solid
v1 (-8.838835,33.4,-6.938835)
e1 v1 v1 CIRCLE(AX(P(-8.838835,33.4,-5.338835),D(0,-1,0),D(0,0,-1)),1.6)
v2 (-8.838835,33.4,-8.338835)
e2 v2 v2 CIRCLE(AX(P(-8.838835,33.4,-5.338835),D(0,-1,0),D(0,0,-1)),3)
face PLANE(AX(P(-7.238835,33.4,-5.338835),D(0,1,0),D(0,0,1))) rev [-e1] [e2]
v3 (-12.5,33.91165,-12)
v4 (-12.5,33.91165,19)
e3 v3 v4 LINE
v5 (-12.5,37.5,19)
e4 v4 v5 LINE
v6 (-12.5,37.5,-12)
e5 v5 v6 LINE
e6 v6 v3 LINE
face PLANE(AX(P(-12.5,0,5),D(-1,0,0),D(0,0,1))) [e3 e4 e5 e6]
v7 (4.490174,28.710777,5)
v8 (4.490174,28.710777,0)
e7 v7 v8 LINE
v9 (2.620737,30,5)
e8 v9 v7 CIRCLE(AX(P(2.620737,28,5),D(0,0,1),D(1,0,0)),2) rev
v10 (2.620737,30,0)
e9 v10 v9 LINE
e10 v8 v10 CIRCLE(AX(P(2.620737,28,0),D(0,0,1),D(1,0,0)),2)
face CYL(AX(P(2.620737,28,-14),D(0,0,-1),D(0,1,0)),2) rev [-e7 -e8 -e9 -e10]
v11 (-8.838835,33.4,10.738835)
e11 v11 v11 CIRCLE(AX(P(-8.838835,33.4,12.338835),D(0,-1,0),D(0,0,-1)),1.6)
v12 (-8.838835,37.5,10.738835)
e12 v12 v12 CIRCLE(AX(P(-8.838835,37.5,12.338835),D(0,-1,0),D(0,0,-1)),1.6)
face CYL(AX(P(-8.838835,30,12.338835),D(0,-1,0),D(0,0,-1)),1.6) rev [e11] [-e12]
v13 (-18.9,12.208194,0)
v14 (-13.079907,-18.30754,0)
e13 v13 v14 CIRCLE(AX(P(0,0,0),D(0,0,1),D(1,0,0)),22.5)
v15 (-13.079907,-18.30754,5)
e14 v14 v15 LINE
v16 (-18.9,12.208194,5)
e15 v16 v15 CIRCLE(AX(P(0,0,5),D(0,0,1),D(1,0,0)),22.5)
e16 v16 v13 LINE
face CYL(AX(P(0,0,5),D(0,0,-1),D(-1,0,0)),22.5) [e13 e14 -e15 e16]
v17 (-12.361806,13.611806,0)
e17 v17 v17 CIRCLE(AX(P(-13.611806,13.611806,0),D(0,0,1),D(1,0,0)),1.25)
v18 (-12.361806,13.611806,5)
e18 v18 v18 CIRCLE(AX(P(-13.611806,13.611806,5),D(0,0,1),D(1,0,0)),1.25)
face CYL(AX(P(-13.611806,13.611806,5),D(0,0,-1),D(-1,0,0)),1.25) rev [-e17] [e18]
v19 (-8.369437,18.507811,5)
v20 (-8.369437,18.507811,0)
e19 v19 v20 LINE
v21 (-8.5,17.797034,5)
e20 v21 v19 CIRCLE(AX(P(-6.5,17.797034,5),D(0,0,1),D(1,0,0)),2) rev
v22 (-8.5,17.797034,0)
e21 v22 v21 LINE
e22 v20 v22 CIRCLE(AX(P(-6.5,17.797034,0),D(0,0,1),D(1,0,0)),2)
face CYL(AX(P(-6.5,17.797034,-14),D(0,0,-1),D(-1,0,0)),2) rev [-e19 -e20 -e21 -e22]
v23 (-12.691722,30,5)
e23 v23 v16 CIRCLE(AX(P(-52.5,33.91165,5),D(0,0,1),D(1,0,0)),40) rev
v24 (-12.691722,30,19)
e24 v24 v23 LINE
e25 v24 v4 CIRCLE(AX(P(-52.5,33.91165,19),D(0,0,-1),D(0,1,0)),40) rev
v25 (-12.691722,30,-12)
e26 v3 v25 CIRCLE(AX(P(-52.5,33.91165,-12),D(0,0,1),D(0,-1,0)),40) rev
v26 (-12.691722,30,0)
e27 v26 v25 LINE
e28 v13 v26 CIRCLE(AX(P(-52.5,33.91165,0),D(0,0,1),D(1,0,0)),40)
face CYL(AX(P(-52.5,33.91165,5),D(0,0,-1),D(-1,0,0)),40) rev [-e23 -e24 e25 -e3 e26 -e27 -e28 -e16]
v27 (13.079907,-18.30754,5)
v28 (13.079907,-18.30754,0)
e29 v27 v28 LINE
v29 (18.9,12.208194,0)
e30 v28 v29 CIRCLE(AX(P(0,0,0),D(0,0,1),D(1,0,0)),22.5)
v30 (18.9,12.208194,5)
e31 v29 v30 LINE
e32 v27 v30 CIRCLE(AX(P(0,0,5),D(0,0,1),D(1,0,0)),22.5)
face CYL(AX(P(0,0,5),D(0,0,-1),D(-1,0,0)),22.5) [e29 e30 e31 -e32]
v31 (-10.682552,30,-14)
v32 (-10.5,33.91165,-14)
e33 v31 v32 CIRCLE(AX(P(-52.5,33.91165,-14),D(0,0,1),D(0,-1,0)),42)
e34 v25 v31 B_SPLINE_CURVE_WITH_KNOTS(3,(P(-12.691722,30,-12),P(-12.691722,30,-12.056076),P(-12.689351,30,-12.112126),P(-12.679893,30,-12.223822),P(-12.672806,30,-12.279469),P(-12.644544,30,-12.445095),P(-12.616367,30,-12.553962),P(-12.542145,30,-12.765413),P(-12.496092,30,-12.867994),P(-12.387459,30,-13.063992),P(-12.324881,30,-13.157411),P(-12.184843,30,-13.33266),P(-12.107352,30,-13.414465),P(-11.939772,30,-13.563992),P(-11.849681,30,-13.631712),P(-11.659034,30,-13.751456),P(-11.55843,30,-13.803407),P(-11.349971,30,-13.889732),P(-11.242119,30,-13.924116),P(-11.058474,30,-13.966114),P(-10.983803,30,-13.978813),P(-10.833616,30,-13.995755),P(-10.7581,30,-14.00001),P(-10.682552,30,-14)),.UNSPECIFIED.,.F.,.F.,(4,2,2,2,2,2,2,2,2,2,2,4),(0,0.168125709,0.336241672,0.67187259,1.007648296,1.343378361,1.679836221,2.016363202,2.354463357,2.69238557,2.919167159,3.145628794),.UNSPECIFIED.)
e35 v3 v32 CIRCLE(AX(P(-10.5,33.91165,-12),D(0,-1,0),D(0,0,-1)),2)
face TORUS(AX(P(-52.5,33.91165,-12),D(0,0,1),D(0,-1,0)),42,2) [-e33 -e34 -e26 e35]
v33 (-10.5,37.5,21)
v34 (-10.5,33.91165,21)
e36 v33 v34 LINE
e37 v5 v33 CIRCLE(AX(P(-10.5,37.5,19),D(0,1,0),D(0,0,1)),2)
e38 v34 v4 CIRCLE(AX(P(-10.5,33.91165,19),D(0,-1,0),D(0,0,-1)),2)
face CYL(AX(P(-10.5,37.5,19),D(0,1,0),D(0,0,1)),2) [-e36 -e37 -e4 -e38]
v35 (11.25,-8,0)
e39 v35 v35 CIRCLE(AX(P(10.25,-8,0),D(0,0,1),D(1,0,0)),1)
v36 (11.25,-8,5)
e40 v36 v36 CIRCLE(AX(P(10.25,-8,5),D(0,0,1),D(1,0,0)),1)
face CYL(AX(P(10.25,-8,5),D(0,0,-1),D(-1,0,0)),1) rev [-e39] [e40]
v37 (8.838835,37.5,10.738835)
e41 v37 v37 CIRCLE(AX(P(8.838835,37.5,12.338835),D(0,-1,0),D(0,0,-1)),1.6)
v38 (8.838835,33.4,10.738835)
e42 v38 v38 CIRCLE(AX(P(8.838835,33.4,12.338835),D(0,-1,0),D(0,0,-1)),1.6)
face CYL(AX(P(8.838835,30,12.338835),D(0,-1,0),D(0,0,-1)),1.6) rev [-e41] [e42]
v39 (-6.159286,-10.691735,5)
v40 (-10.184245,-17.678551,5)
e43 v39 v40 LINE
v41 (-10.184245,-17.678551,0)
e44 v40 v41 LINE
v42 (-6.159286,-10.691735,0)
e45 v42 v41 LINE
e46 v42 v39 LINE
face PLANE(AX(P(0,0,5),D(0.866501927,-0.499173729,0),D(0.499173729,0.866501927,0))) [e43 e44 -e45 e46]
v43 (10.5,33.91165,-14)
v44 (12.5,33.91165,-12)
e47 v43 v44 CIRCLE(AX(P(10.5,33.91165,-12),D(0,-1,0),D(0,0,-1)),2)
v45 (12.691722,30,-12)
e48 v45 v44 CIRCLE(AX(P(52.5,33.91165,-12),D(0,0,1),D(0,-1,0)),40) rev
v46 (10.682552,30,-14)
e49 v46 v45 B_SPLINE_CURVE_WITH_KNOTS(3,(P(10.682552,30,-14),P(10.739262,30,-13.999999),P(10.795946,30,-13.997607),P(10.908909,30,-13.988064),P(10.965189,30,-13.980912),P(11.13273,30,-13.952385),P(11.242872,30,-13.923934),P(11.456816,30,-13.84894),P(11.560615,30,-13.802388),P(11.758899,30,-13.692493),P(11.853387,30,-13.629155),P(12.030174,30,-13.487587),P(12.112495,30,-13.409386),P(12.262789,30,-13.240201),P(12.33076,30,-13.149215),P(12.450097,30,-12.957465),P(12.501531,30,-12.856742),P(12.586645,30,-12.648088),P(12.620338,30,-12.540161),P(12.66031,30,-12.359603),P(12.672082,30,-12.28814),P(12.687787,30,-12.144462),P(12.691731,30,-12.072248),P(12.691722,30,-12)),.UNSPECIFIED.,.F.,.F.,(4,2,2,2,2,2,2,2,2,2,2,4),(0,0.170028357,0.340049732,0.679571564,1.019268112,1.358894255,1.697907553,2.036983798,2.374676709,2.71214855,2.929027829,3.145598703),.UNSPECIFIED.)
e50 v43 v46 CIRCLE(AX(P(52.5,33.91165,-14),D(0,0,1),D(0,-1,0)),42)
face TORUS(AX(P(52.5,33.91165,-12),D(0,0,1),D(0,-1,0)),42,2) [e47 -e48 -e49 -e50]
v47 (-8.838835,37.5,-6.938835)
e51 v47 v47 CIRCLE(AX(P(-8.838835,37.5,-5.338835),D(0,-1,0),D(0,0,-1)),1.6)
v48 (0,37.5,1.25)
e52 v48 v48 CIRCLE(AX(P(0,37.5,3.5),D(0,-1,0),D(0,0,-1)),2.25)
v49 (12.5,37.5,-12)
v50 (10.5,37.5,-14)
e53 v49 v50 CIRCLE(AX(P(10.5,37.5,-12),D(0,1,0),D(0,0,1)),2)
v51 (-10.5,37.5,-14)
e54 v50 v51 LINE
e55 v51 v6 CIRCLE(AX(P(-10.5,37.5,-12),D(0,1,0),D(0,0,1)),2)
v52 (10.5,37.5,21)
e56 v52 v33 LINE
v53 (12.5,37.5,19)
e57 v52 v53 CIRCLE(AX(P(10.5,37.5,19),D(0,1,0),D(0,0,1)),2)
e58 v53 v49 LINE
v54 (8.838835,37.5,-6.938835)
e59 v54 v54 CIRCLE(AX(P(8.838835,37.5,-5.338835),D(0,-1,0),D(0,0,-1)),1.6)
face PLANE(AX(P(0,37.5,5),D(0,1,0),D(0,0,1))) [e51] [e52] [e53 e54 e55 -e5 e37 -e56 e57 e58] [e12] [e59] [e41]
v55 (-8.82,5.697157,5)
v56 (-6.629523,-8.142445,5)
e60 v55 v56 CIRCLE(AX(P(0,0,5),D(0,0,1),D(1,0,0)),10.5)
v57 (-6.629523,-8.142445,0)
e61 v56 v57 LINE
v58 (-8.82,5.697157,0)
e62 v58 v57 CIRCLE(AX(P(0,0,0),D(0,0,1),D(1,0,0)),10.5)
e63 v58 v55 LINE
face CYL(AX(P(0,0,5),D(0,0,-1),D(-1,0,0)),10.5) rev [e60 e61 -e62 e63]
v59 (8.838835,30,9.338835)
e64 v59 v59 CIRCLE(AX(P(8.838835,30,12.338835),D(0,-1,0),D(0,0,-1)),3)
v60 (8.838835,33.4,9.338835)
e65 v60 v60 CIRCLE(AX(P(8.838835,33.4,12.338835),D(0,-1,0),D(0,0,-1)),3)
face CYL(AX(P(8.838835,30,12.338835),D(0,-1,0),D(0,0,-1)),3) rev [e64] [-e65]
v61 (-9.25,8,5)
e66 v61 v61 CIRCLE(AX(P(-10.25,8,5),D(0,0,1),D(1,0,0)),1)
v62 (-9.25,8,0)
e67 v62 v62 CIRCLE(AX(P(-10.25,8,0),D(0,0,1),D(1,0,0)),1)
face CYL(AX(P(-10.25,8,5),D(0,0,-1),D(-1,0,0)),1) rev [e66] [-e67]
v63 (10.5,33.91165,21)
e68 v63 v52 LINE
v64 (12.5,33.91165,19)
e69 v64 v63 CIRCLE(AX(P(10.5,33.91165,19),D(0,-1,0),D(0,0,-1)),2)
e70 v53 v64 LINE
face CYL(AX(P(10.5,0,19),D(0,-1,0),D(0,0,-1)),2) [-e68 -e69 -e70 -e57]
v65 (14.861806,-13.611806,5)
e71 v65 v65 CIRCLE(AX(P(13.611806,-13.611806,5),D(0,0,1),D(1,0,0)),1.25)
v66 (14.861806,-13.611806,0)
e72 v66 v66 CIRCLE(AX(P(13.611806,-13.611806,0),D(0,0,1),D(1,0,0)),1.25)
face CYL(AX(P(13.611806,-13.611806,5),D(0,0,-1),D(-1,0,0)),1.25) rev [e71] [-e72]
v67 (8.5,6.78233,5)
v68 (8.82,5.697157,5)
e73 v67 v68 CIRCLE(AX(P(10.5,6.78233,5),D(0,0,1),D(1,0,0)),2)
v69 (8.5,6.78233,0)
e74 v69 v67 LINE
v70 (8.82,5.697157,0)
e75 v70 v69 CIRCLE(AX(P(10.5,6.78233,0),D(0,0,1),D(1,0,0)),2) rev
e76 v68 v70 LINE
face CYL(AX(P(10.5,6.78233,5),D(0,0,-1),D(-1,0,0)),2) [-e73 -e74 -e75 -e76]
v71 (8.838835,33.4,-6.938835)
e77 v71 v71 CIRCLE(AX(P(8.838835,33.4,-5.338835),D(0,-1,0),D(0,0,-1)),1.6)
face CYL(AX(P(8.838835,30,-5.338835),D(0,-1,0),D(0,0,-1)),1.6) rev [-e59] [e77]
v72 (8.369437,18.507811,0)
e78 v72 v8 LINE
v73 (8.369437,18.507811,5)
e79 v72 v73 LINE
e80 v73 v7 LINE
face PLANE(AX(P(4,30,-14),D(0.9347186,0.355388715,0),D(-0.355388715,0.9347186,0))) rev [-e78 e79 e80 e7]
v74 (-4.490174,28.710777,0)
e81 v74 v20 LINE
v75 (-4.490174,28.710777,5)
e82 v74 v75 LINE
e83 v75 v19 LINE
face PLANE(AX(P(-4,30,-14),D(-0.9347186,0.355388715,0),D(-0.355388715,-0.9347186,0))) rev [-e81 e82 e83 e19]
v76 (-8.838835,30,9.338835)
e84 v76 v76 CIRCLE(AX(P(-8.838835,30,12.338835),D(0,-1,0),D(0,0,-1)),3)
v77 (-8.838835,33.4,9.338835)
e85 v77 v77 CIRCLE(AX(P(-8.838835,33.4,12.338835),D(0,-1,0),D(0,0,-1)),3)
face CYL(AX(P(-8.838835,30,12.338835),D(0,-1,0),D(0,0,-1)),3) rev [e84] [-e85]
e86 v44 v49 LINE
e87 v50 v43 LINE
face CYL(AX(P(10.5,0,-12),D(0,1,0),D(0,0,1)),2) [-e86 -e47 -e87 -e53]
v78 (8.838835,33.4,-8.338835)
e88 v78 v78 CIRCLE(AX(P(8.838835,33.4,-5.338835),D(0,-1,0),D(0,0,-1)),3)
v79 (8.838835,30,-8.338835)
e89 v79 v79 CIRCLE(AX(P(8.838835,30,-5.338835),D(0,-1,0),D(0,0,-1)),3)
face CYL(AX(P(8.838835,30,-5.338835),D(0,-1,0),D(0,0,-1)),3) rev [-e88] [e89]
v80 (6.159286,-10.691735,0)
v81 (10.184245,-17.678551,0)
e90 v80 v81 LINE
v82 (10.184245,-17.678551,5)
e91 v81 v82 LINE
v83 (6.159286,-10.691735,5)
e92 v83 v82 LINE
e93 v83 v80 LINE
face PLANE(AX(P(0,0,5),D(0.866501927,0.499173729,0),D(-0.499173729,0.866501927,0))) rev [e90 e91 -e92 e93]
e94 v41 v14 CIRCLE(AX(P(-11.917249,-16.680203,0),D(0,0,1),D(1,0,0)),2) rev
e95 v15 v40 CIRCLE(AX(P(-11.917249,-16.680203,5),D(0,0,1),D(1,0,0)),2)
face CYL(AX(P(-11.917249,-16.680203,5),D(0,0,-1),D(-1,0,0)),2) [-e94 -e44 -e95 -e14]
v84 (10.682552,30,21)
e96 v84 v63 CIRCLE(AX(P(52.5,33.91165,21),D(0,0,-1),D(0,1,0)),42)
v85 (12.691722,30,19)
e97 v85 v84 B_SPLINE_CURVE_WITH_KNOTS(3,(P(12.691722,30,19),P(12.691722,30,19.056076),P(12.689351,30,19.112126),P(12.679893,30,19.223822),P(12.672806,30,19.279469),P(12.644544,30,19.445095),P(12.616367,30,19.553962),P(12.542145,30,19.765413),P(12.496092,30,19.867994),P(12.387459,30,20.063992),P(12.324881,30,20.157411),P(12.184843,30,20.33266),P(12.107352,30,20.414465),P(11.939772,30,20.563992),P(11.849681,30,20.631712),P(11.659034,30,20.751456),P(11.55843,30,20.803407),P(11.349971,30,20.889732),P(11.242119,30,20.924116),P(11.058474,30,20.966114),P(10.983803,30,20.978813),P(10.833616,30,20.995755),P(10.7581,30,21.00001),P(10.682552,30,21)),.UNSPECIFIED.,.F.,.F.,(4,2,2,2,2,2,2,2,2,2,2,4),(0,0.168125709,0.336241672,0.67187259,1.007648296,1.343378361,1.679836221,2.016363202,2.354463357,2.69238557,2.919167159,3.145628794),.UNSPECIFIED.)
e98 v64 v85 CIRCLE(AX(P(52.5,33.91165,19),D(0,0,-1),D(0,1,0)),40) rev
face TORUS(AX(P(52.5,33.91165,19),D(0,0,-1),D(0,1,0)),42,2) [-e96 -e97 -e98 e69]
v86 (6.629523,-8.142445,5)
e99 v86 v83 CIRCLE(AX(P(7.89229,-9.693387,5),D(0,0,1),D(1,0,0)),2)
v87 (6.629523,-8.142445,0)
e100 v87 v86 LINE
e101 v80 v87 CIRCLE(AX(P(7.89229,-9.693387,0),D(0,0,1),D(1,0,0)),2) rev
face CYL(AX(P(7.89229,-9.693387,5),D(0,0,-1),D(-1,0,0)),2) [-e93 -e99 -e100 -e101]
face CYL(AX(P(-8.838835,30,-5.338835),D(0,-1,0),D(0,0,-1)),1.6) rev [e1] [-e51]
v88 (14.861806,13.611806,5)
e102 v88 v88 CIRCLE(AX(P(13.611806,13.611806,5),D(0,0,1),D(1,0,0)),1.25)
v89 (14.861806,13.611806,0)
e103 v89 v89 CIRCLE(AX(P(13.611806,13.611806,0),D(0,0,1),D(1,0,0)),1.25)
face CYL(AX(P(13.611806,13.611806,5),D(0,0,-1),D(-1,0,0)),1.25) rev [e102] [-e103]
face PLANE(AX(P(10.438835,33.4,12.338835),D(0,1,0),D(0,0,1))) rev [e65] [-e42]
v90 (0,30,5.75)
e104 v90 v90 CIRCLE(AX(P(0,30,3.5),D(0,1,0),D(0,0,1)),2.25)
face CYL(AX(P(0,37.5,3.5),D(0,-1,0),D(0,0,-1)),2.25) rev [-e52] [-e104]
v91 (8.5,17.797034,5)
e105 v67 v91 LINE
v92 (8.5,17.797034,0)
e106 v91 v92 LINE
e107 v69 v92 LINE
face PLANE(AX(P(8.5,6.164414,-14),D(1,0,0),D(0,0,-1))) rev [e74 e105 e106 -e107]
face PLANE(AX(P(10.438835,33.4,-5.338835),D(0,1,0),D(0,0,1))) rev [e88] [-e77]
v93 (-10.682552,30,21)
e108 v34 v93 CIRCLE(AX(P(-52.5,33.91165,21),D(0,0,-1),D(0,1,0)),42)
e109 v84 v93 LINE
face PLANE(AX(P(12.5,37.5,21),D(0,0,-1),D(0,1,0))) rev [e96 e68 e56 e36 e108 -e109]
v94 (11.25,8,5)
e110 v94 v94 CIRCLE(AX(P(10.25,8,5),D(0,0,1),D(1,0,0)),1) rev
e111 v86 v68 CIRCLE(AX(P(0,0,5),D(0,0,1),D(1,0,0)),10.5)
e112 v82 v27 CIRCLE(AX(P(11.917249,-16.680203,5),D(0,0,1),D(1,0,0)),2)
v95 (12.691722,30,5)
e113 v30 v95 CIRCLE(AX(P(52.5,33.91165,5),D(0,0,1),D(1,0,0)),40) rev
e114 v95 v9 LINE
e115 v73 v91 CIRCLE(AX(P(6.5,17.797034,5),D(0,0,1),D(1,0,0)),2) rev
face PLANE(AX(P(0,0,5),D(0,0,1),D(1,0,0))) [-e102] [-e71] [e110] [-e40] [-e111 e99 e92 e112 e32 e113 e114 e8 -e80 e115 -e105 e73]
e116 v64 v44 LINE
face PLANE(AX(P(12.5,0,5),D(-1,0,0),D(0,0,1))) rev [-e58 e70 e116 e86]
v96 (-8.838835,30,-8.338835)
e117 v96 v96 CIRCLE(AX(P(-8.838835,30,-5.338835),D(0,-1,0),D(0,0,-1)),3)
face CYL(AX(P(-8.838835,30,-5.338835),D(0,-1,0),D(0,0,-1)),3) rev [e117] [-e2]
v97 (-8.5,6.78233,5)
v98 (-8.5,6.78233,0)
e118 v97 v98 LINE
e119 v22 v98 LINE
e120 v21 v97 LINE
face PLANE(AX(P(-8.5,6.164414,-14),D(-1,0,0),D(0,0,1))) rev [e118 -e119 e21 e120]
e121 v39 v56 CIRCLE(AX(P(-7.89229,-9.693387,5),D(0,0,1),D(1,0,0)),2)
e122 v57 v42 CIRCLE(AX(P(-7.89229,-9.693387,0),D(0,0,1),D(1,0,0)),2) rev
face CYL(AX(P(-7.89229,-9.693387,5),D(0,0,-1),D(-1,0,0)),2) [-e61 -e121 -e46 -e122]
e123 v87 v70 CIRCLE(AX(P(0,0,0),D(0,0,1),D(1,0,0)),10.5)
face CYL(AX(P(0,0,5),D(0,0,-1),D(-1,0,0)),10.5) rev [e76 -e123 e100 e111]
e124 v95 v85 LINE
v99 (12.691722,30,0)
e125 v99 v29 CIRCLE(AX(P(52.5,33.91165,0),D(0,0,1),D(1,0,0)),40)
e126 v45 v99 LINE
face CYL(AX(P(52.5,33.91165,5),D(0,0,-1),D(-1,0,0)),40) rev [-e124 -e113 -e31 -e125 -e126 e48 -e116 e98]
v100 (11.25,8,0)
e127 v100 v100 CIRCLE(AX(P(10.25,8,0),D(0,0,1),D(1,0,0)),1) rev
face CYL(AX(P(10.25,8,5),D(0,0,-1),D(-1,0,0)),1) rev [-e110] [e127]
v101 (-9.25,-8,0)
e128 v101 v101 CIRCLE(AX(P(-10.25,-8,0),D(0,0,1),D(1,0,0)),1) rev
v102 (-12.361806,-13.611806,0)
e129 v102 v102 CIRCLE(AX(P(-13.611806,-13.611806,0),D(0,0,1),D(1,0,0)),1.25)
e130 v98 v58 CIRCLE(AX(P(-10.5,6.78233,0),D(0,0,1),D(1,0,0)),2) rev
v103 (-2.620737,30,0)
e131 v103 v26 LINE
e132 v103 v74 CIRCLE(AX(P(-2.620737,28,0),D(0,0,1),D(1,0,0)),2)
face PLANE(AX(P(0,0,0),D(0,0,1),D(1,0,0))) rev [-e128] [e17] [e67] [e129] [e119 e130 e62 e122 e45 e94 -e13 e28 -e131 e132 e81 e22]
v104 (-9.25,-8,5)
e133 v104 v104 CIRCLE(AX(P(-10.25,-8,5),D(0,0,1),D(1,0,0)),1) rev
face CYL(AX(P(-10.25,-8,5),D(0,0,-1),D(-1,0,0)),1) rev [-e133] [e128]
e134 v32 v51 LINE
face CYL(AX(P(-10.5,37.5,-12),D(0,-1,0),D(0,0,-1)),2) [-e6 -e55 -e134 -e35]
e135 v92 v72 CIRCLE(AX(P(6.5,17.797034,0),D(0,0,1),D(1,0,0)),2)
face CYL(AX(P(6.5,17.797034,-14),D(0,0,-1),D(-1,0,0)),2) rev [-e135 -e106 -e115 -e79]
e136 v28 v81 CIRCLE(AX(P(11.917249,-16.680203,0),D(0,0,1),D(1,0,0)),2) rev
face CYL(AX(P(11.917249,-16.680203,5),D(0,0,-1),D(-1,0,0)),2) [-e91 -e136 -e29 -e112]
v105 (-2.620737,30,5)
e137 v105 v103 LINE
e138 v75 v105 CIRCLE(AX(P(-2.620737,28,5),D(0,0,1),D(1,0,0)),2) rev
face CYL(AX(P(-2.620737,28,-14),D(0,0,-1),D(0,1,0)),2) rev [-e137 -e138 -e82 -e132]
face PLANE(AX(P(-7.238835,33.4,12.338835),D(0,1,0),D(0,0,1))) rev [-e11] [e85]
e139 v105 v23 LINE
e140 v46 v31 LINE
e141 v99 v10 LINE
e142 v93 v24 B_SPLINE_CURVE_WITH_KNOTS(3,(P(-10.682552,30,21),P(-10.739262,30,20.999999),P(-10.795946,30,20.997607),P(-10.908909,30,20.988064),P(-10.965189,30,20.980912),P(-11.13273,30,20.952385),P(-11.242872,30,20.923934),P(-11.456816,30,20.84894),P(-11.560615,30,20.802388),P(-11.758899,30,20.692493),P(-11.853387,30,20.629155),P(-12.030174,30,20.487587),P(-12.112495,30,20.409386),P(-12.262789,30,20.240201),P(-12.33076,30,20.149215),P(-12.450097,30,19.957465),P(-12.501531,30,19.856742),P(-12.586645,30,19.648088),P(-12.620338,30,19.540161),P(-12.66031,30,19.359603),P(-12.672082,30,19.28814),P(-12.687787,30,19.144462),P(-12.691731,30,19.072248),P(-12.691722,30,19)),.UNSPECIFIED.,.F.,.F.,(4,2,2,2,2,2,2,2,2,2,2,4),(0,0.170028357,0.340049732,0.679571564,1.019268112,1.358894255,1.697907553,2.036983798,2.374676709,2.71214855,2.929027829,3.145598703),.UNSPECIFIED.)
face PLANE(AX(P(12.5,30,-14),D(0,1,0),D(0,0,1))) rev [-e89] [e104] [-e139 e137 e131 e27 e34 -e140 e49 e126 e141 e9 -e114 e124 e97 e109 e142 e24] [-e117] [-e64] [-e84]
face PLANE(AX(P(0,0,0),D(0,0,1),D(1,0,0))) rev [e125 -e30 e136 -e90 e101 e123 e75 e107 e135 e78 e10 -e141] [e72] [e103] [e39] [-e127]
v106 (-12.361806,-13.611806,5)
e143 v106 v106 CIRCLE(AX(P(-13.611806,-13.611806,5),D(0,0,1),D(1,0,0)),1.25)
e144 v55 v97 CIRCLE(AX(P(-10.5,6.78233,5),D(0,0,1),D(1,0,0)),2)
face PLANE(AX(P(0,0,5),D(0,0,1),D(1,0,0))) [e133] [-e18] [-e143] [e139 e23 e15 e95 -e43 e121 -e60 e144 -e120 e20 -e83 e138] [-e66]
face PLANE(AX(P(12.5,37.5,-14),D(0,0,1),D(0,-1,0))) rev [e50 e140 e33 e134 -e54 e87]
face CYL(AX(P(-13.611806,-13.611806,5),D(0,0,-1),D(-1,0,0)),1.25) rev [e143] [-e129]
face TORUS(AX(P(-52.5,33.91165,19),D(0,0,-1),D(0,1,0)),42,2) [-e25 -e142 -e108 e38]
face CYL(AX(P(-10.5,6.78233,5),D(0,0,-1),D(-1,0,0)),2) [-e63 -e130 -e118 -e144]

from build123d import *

# Parameters (mm, degrees)
SKETCH_1_R                   = 1.25
SKETCH_1_R_2                 = 1
EXTRUDE_1_DEPTH              = 5
SKETCH_3_W                   = 35
SKETCH_3_H                   = 7.5
EXTRUDE_2_DEPTH              = 12.5
SKETCH_5_R                   = 2.25
CUT_EXTRUDE_1_DEPTH          = 7.5
FILLET_2_R                   = 40
HOLE_WIZARD_M3_1_D           = 3.2
HOLE_WIZARD_M3_1_CBORE_D     = 6
HOLE_WIZARD_M3_1_CBORE_DEPTH = 3.4
CUT_EXTRUDE_2_DEPTH          = 48.681233206
FILLET_1_R                   = 2


with BuildPart() as part:
    # 草图1 → 凸台-拉伸1 (new body)
    # profile 1 of 2: a face of its own
    with BuildSketch(Plane.XY):
        with BuildLine():
            ThreePointArc((12.5, 18.708286934), (0, 22.5), (-12.5, 18.708286934))
            ThreePointArc((-12.5, 18.708286934), (-22.487606156, -0.746705683), (-11.231408892, -19.496293348))
            Line((-11.231408892, -19.496293348), (-5.24132415, -9.098270229))
            ThreePointArc((-5.24132415, -9.098270229), (-5.254336134, 9.090761892), (10.5, 0))
            ThreePointArc((10.5, 0), (9.090761892, -5.254336134), (5.24132415, -9.098270229))
            Line((5.24132415, -9.098270229), (11.231408892, -19.496293348))
            ThreePointArc((11.231408892, -19.496293348), (19.480204055, -11.259291717), (22.5, 0))
            ThreePointArc((22.5, 0), (19.843134833, 10.606601718), (12.5, 18.708286934))
        make_face()
        with Locations((-13.611805538, -13.611805538)):
            Circle(SKETCH_1_R, mode=Mode.SUBTRACT)
        with Locations((-10.25, -8)):
            Circle(SKETCH_1_R_2, mode=Mode.SUBTRACT)
        with Locations((10.25, -8)):
            Circle(SKETCH_1_R_2, mode=Mode.SUBTRACT)
        with Locations((13.611805538, -13.611805538)):
            Circle(SKETCH_1_R, mode=Mode.SUBTRACT)
        with Locations((-13.611805538, 13.611805538)):
            Circle(SKETCH_1_R, mode=Mode.SUBTRACT)
        with Locations((-10.25, 8)):
            Circle(SKETCH_1_R_2, mode=Mode.SUBTRACT)
        with Locations((10.25, 8)):
            Circle(SKETCH_1_R_2, mode=Mode.SUBTRACT)
        with Locations((13.611805538, 13.611805538)):
            Circle(SKETCH_1_R, mode=Mode.SUBTRACT)
    # profile 2 of 2: a face of its own
    with BuildSketch(Plane.XY):
        with BuildLine():
            Line((-12.5, 37.5), (-12.5, 18.708286934))
            ThreePointArc((-12.5, 18.708286934), (0, 22.5), (12.5, 18.708286934))
            Line((12.5, 18.708286934), (12.5, 37.5))
            Line((12.5, 37.5), (-12.5, 37.5))
        make_face()
    extrude(amount=EXTRUDE_1_DEPTH)

    # 草图3 → 凸台-拉伸2 (add, symmetric)
    with BuildSketch(Plane(origin=(0, 0, 0), x_dir=(0, 0, -1), z_dir=(1, 0, 0))):
        with Locations((-3.5, 33.75)):
            Rectangle(SKETCH_3_W, SKETCH_3_H)
    extrude(amount=EXTRUDE_2_DEPTH, both=True)

    # 草图5 → 切除-拉伸1 (cut, symmetric)
    with BuildSketch(Plane.XZ.offset(-30)):
        with Locations(Location((0, 3.5, 0), (0, 0, 270))):
            Circle(SKETCH_5_R)
    extrude(amount=CUT_EXTRUDE_1_DEPTH, both=True, mode=Mode.SUBTRACT)

    # 圆角2
    # the kernel refuses this fillet: 40 mm, written as the material it adds along each edge
    with BuildSketch(Plane(origin=(-12.5, 18.708286934, -38.008407454), x_dir=(-0.7015991579933682, -0.7125718360298817, 0), z_dir=(0, 0, 1))) as fillet_2_piece_1_section:
        with BuildLine():
            CenterArc((17.230478046, -39.169540108), FILLET_2_R, 101.695565513, 32.859880379)
            Line((-10.833488274, -10.666666667), (0, 0))
            ThreePointArc((0, 0), (4.561008895, -0.467133689), (9.122017789, 0))
        make_face()
    fillet_2_piece_1 = extrude(amount=43.008407454, mode=Mode.PRIVATE)
    fillet_2_piece_1 = split(fillet_2_piece_1, bisect_by=Plane(origin=(-12.133812824, 31.883513777, 0), z_dir=(0, 0, -1)), keep=Keep.TOP, mode=Mode.PRIVATE)
    fillet_2_piece_1 = split(fillet_2_piece_1, bisect_by=Plane(origin=(-12.133812824, 30, -7), z_dir=(0, 1, 0)), keep=Keep.TOP, mode=Mode.PRIVATE)
    fillet_2_piece_1 = split(fillet_2_piece_1, bisect_by=Plane(origin=(-12.133812824, 31.883513777, -14), z_dir=(0, 0, 1)), keep=Keep.TOP, mode=Mode.PRIVATE)
    add(fillet_2_piece_1)
    with BuildSketch(Plane(origin=(-12.5, 18.708286934, 0), x_dir=(-0.7015991579933694, -0.7125718360298806, 0), z_dir=(0, 0, 1))) as fillet_2_piece_2_section:
        with BuildLine():
            CenterArc((17.230478046, -39.169540108), FILLET_2_R, 101.695565513, 32.859880379)
            Line((-10.833488274, -10.666666667), (0, 0))
            ThreePointArc((0, 0), (4.561008895, -0.467133689), (9.122017789, 0))
        make_face()
    fillet_2_piece_2 = extrude(amount=5, mode=Mode.PRIVATE)
    fillet_2_piece_2 = split(fillet_2_piece_2, bisect_by=Plane(origin=(-13.82835822, 30, 2.5), z_dir=(0, -1, 0)), keep=Keep.TOP, mode=Mode.PRIVATE)
    add(fillet_2_piece_2)
    with BuildSketch(Plane(origin=(-12.5, 18.708286934, 0), x_dir=(-0.7015991579933694, -0.7125718360298806, 0), z_dir=(0, 0, 1))) as fillet_2_piece_3_section:
        with BuildLine():
            CenterArc((17.230478046, -39.169540108), FILLET_2_R, 101.695565513, 32.859880379)
            Line((-10.833488274, -10.666666667), (0, 0))
            ThreePointArc((0, 0), (4.561008895, -0.467133689), (9.122017789, 0))
        make_face()
    fillet_2_piece_3 = extrude(amount=5, mode=Mode.PRIVATE)
    fillet_2_piece_3 = split(fillet_2_piece_3, bisect_by=Plane(origin=(-12.133812824, 30, 2.5), z_dir=(0, 1, 0)), keep=Keep.TOP, mode=Mode.PRIVATE)
    add(fillet_2_piece_3)
    with BuildSketch(Plane(origin=(-12.5, 18.708286934, 0), x_dir=(-0.7015991579933694, -0.7125718360298806, 0), z_dir=(0, 0, 1))) as fillet_2_piece_4_section:
        with BuildLine():
            CenterArc((17.230478046, -39.169540108), FILLET_2_R, 101.695565513, 32.859880379)
            Line((-10.833488274, -10.666666667), (0, 0))
            ThreePointArc((0, 0), (4.561008895, -0.467133689), (9.122017789, 0))
        make_face()
    fillet_2_piece_4 = extrude(amount=43.008407454, mode=Mode.PRIVATE)
    fillet_2_piece_4 = split(fillet_2_piece_4, bisect_by=Plane(origin=(-12.133812824, 31.883513777, 5), z_dir=(0, 0, 1)), keep=Keep.TOP, mode=Mode.PRIVATE)
    fillet_2_piece_4 = split(fillet_2_piece_4, bisect_by=Plane(origin=(-12.133812824, 30, 13), z_dir=(0, 1, 0)), keep=Keep.TOP, mode=Mode.PRIVATE)
    fillet_2_piece_4 = split(fillet_2_piece_4, bisect_by=Plane(origin=(-12.133812824, 31.883513777, 21), z_dir=(0, 0, -1)), keep=Keep.TOP, mode=Mode.PRIVATE)
    add(fillet_2_piece_4)
    with BuildSketch(Plane(origin=(12.5, 18.708286934, -38.008407454), x_dir=(0.7015991579933666, -0.7125718360298834, 0), z_dir=(0, 0, 1))) as fillet_2_piece_5_section:
        with BuildLine():
            CenterArc((17.230478046, 39.169540108), FILLET_2_R, 225.444554108, 32.859880379)
            Line((-10.833488274, 10.666666667), (0, 0))
            ThreePointArc((0, 0), (4.561008895, 0.467133689), (9.122017789, 0))
        make_face()
    fillet_2_piece_5 = extrude(amount=43.008407454, mode=Mode.PRIVATE)
    fillet_2_piece_5 = split(fillet_2_piece_5, bisect_by=Plane(origin=(12.133812824, 31.883513777, 0), z_dir=(0, 0, -1)), keep=Keep.TOP, mode=Mode.PRIVATE)
    fillet_2_piece_5 = split(fillet_2_piece_5, bisect_by=Plane(origin=(12.133812824, 30, -7), z_dir=(0, 1, 0)), keep=Keep.TOP, mode=Mode.PRIVATE)
    fillet_2_piece_5 = split(fillet_2_piece_5, bisect_by=Plane(origin=(12.133812824, 31.883513777, -14), z_dir=(0, 0, 1)), keep=Keep.TOP, mode=Mode.PRIVATE)
    add(fillet_2_piece_5)
    with BuildSketch(Plane(origin=(12.5, 18.708286934, 0), x_dir=(0.7015991579933667, -0.7125718360298833, 0), z_dir=(0, 0, 1))) as fillet_2_piece_6_section:
        with BuildLine():
            CenterArc((17.230478046, 39.169540108), FILLET_2_R, 225.444554108, 32.859880379)
            Line((-10.833488274, 10.666666667), (0, 0))
            ThreePointArc((0, 0), (4.561008895, 0.467133689), (9.122017789, 0))
        make_face()
    fillet_2_piece_6 = extrude(amount=5, mode=Mode.PRIVATE)
    fillet_2_piece_6 = split(fillet_2_piece_6, bisect_by=Plane(origin=(13.82835822, 30, 2.5), z_dir=(0, -1, 0)), keep=Keep.TOP, mode=Mode.PRIVATE)
    add(fillet_2_piece_6)
    with BuildSketch(Plane(origin=(12.5, 18.708286934, 0), x_dir=(0.7015991579933667, -0.7125718360298833, 0), z_dir=(0, 0, 1))) as fillet_2_piece_7_section:
        with BuildLine():
            CenterArc((17.230478046, 39.169540108), FILLET_2_R, 225.444554108, 32.859880379)
            Line((-10.833488274, 10.666666667), (0, 0))
            ThreePointArc((0, 0), (4.561008895, 0.467133689), (9.122017789, 0))
        make_face()
    fillet_2_piece_7 = extrude(amount=5, mode=Mode.PRIVATE)
    fillet_2_piece_7 = split(fillet_2_piece_7, bisect_by=Plane(origin=(12.133812824, 30, 2.5), z_dir=(0, 1, 0)), keep=Keep.TOP, mode=Mode.PRIVATE)
    add(fillet_2_piece_7)
    with BuildSketch(Plane(origin=(12.5, 18.708286934, 0), x_dir=(0.7015991579933667, -0.7125718360298833, 0), z_dir=(0, 0, 1))) as fillet_2_piece_8_section:
        with BuildLine():
            CenterArc((17.230478046, 39.169540108), FILLET_2_R, 225.444554108, 32.859880379)
            Line((-10.833488274, 10.666666667), (0, 0))
            ThreePointArc((0, 0), (4.561008895, 0.467133689), (9.122017789, 0))
        make_face()
    fillet_2_piece_8 = extrude(amount=43.008407454, mode=Mode.PRIVATE)
    fillet_2_piece_8 = split(fillet_2_piece_8, bisect_by=Plane(origin=(12.133812824, 31.883513777, 5), z_dir=(0, 0, 1)), keep=Keep.TOP, mode=Mode.PRIVATE)
    fillet_2_piece_8 = split(fillet_2_piece_8, bisect_by=Plane(origin=(12.133812824, 30, 13), z_dir=(0, 1, 0)), keep=Keep.TOP, mode=Mode.PRIVATE)
    fillet_2_piece_8 = split(fillet_2_piece_8, bisect_by=Plane(origin=(12.133812824, 31.883513777, 21), z_dir=(0, 0, -1)), keep=Keep.TOP, mode=Mode.PRIVATE)
    add(fillet_2_piece_8)

    # M3 六角圆柱头螺钉的柱形沉头孔1 (through all)
    with Locations(Plane(origin=(0, 30, 0), x_dir=(-1, 0, 0), z_dir=(0, -1, 0))):
        with Locations((8.838834765, -12.338834765), (-8.838834765, -12.338834765), (-8.838834765, 5.338834765), (8.838834765, 5.338834765)):
            CounterBoreHole(HOLE_WIZARD_M3_1_D / 2, HOLE_WIZARD_M3_1_CBORE_D / 2, HOLE_WIZARD_M3_1_CBORE_DEPTH)

    # 草图9 → 切除-拉伸2 (cut, through all)
    with BuildSketch(Plane.XY.offset(5)):
        Polygon((-4, 30), (-8.5, 18.164414003), (-8.5, 6.164414003), (8.5, 6.164414003), (8.5, 18.164414003), (4, 30), align=None)
    extrude(amount=-CUT_EXTRUDE_2_DEPTH, mode=Mode.SUBTRACT)

    # 圆角1
    fillet_1_edges = [part.edges().sort_by_distance(p)[0] for p in [
        (8.5, 6.164414003, 2.5),
        (-8.5, 6.164414003, 2.5),
        (-8.5, 18.164414003, 2.5),
        (4, 30, 2.5),
        (8.5, 18.164414003, 2.5),
        (-4, 30, 2.5),
        (11.231408892, -19.496293348, 2.5),
        (5.24132415, -9.098270229, 2.5),
        (-5.24132415, -9.098270229, 2.5),
        (-11.231408892, -19.496293348, 2.5),
        (-12.5, 35.705824958, 21),
        (12.5, 35.705824958, 21),
        (-12.5, 35.705824958, -14),
        (12.5, 35.705824958, -14),
        (-12.547959259, 31.953477145, -14),
        (-12.547959259, 31.953477145, 21),
        (12.547959259, 31.953477145, -14),
        (12.547959259, 31.953477145, 21),
    ]]
    fillet(fillet_1_edges, radius=FILLET_1_R)


solid = part.part
